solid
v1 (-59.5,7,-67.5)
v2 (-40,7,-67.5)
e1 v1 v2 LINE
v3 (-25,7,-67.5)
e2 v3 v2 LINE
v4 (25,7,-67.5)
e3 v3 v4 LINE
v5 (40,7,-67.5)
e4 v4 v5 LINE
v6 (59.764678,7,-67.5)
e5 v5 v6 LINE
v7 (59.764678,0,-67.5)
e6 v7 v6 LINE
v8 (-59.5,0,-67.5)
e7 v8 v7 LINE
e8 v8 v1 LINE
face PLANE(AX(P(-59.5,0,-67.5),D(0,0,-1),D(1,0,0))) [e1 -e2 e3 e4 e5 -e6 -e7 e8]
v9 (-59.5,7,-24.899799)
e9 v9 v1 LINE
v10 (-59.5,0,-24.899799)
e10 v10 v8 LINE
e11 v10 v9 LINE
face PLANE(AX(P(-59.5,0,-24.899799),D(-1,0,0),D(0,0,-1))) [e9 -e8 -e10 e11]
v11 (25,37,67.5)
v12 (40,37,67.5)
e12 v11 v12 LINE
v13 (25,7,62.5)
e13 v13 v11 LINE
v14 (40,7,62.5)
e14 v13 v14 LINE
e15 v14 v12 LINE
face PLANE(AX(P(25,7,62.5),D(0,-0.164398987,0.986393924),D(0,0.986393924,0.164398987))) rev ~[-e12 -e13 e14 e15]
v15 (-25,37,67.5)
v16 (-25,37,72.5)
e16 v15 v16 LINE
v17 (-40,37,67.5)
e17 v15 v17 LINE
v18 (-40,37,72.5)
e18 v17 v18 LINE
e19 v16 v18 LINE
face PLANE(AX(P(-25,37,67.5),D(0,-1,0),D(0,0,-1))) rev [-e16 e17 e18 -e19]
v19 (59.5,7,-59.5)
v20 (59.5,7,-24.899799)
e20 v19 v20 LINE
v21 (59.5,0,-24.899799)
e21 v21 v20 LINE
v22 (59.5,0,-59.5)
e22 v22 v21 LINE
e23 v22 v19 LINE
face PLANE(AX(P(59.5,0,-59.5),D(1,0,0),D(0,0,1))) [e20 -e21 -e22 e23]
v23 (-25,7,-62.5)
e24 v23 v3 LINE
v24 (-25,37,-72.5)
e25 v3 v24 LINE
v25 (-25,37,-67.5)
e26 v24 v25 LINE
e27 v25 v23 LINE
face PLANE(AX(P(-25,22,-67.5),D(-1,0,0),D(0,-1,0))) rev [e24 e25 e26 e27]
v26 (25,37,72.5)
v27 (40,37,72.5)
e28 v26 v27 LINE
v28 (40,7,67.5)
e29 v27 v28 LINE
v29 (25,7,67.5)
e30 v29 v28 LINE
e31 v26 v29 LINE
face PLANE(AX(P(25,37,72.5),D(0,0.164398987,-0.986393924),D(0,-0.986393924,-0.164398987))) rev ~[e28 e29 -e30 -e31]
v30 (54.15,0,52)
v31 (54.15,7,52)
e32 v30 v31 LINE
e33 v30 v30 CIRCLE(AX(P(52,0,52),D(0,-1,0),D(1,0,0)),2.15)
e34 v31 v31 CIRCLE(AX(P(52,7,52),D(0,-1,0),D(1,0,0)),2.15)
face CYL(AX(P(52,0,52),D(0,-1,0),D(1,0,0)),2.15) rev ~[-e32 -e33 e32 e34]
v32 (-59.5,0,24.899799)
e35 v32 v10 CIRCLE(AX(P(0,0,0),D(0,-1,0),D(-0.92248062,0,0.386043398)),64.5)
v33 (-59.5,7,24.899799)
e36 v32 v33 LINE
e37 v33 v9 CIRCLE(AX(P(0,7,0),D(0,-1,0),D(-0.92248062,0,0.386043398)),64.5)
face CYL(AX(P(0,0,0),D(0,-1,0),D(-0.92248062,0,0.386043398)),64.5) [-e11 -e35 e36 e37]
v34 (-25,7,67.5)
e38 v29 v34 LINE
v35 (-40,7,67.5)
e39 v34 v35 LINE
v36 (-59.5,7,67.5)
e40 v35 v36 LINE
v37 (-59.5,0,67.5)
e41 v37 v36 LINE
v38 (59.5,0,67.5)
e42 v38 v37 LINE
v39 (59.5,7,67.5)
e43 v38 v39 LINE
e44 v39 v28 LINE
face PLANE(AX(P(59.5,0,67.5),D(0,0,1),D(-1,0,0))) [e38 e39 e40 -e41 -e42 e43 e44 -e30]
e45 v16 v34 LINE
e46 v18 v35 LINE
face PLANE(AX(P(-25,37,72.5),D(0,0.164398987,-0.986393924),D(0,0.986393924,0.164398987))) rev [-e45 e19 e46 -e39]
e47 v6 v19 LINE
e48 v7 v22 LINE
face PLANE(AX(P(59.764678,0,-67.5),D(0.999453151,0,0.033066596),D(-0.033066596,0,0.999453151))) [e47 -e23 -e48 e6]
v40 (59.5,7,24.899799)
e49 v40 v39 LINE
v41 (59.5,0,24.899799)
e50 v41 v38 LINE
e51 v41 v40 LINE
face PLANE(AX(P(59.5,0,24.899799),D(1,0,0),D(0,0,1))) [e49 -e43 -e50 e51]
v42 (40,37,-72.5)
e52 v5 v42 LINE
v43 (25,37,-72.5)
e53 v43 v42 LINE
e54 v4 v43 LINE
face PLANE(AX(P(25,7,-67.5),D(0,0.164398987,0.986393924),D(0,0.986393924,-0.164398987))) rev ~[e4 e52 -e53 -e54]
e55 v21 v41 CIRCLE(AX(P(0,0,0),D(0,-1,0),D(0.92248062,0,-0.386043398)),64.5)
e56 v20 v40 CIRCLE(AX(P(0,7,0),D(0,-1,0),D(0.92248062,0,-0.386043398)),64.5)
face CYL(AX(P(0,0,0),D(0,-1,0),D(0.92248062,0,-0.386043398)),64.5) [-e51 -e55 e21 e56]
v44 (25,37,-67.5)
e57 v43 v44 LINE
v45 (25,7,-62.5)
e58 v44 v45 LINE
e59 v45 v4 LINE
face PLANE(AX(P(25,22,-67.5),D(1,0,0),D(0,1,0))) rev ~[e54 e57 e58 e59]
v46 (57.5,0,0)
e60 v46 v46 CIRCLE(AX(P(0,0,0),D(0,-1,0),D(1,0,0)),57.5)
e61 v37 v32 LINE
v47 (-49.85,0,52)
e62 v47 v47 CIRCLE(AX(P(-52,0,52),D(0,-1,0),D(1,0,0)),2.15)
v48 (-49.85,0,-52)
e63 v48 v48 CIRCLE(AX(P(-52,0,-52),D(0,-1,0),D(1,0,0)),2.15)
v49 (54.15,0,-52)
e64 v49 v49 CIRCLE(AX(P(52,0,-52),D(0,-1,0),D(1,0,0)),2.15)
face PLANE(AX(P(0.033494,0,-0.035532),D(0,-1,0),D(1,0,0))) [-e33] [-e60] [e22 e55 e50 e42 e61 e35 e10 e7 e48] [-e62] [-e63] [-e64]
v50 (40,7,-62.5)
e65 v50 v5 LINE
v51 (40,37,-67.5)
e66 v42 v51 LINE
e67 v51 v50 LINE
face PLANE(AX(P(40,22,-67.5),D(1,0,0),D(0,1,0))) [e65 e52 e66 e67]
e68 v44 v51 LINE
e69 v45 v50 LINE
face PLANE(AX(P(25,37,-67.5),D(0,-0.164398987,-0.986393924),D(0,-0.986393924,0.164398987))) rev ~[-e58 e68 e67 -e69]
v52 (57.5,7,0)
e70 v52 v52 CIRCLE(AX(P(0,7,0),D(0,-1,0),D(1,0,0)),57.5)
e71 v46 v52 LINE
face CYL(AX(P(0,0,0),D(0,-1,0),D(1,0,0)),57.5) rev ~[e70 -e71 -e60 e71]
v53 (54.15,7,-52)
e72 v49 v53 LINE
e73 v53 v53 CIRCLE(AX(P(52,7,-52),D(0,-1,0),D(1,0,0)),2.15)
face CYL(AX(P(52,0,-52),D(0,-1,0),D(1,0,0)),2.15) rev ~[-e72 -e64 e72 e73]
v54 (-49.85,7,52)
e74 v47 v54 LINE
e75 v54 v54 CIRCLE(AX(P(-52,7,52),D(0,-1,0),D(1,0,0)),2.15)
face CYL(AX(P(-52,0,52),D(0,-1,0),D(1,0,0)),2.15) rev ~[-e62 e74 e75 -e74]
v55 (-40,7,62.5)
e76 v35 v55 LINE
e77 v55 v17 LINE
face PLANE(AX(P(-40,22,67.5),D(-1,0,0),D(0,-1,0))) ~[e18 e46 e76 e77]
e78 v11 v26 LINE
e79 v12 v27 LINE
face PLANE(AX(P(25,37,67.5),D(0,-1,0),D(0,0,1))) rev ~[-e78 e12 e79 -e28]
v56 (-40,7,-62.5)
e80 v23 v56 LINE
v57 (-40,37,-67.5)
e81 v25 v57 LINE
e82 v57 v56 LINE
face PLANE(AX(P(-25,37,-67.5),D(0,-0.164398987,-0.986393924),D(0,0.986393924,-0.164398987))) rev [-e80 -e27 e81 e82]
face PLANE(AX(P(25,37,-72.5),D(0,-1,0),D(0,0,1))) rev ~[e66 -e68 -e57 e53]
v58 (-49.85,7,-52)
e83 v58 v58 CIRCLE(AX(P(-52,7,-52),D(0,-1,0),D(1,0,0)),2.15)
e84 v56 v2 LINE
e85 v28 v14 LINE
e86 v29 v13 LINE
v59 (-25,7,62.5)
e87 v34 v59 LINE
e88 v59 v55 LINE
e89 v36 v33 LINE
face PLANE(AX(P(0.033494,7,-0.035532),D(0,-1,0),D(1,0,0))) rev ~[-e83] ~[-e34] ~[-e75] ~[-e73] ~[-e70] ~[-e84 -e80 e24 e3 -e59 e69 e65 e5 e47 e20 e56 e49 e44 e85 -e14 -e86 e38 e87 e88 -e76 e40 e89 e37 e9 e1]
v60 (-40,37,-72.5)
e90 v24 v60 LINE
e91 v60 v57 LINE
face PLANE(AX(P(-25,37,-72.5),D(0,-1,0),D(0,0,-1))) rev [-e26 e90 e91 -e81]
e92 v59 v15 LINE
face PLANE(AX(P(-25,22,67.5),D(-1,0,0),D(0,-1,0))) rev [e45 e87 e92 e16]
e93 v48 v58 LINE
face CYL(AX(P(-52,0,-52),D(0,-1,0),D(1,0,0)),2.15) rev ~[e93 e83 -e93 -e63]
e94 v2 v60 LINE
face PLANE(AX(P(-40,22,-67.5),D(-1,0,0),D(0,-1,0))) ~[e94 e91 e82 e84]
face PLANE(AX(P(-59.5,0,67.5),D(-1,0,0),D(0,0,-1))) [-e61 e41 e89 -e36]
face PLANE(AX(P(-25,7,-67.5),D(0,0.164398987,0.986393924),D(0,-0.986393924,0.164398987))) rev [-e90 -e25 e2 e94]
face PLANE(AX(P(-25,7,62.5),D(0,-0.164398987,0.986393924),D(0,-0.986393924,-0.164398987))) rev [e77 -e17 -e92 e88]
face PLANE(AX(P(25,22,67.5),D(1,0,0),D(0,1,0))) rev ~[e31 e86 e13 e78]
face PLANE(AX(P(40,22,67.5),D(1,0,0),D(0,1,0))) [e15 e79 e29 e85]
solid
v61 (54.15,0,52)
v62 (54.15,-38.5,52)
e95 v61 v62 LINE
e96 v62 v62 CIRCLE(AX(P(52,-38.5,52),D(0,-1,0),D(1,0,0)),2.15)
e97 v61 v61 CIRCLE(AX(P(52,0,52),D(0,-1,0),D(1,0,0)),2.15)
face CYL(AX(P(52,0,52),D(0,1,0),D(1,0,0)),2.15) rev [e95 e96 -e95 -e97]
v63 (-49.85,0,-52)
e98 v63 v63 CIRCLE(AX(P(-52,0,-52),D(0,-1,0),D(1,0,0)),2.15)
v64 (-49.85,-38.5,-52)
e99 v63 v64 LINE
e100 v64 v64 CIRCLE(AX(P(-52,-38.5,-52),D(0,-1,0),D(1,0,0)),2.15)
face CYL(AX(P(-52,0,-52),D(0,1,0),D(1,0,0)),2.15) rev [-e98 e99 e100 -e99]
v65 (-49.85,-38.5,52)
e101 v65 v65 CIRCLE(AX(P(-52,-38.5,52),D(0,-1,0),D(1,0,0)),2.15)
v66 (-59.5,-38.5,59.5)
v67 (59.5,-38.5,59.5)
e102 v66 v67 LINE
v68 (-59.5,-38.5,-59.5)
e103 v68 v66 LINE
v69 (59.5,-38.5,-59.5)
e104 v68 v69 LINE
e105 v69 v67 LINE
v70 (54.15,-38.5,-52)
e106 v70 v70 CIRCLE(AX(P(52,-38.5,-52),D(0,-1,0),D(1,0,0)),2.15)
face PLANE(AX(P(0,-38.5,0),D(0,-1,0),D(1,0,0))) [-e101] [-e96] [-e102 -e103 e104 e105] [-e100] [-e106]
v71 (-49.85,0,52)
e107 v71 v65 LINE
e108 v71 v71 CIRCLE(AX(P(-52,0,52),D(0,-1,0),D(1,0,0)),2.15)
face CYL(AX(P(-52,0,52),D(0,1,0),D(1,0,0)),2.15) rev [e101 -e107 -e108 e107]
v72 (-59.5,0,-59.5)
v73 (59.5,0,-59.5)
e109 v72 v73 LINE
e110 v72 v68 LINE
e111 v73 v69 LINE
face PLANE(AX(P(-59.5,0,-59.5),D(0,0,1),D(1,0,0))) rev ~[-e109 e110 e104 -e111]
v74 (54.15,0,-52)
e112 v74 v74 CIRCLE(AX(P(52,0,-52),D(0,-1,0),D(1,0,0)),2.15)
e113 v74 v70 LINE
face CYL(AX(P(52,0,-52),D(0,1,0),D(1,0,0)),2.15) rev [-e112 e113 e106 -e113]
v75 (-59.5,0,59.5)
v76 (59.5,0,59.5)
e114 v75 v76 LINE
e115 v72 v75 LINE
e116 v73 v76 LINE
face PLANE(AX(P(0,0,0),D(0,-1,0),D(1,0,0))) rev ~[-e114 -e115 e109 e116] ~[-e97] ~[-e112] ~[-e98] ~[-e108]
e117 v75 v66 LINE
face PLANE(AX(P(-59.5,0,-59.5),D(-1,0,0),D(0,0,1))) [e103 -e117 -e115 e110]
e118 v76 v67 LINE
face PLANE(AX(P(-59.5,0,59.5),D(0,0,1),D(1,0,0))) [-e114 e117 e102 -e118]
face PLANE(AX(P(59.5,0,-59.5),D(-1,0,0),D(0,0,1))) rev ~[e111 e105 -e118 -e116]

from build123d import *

# Parameters (mm, degrees)
F1_W     = 119
F1_H     = 119
F1_R     = 2.15
F2_DEPTH = 38.5
F3_R     = 2.15
F3_R_2   = 57.5
F4_DEPTH = 7
F6_START = 25
F6_DEPTH = 15


# Not quite as in the source:
# - a pattern or mirror of a feature is missing from the dataset's text; its kind, count and spacing are read off the source's solid


with BuildPart() as f2:
    # F1 (on Front) → F2 (new body)
    with BuildSketch(Plane.XZ):
        Rectangle(F1_W, F1_H)
        with Locations((-52, -52)):
            Circle(F1_R, mode=Mode.SUBTRACT)
        with Locations((52, -52)):
            Circle(F1_R, mode=Mode.SUBTRACT)
        with Locations((-52, 52)):
            Circle(F1_R, mode=Mode.SUBTRACT)
        with Locations((52, 52)):
            Circle(F1_R, mode=Mode.SUBTRACT)
    extrude(amount=F2_DEPTH)


with BuildPart() as f4:
    # F3 (on Front) → F4 (new body)
    with BuildSketch(Plane.XZ):
        with BuildLine():
            Line((59.7646775065, -67.5), (59.5, -59.5))
            Line((59.5, -59.5), (59.5, -24.899799196))
            ThreePointArc((59.5, -24.899799196), (64.5, 0), (59.5, 24.899799196))
            Line((59.5, 24.899799196), (59.5, 59.5))
            Line((59.5, 59.5), (59.5, 67.5))
            Line((59.5, 67.5), (-59.5, 67.5))
            Line((-59.5, 67.5), (-59.5, 59.5))
            Line((-59.5, 59.5), (-59.5, 24.899799196))
            ThreePointArc((-59.5, 24.899799196), (-64.5, 0), (-59.5, -24.899799196))
            Line((-59.5, -24.899799196), (-59.5, -59.5))
            Line((-59.5, -59.5), (-59.5, -67.5))
            Line((-59.5, -67.5), (59.7646775065, -67.5))
        make_face()
        with Locations((-52, -52)):
            Circle(F3_R, mode=Mode.SUBTRACT)
        with Locations((52, -52)):
            Circle(F3_R, mode=Mode.SUBTRACT)
        Circle(F3_R_2, mode=Mode.SUBTRACT)
        with Locations((-52, 52)):
            Circle(F3_R, mode=Mode.SUBTRACT)
        with Locations((52, 52)):
            Circle(F3_R, mode=Mode.SUBTRACT)
    extrude(amount=-F4_DEPTH)

    # F5 (on Right) → F6 (join)
    with BuildSketch(Plane.YZ.offset(F6_START)):
        Polygon((37, 72.5), (7, 67.5), (7, 62.5), (37, 67.5), align=None)
        Polygon((37, -67.5), (7, -62.5), (7, -67.5), (37, -72.5), align=None)
    f6 = extrude(amount=F6_DEPTH)

    # F6_copies: F6 across plane
    add(f6.mirror(Plane(origin=(0, 0, 0), x_dir=(0, 0, -1), z_dir=(-1, 0, 0))))


solid = Compound([f2.part, f4.part])
